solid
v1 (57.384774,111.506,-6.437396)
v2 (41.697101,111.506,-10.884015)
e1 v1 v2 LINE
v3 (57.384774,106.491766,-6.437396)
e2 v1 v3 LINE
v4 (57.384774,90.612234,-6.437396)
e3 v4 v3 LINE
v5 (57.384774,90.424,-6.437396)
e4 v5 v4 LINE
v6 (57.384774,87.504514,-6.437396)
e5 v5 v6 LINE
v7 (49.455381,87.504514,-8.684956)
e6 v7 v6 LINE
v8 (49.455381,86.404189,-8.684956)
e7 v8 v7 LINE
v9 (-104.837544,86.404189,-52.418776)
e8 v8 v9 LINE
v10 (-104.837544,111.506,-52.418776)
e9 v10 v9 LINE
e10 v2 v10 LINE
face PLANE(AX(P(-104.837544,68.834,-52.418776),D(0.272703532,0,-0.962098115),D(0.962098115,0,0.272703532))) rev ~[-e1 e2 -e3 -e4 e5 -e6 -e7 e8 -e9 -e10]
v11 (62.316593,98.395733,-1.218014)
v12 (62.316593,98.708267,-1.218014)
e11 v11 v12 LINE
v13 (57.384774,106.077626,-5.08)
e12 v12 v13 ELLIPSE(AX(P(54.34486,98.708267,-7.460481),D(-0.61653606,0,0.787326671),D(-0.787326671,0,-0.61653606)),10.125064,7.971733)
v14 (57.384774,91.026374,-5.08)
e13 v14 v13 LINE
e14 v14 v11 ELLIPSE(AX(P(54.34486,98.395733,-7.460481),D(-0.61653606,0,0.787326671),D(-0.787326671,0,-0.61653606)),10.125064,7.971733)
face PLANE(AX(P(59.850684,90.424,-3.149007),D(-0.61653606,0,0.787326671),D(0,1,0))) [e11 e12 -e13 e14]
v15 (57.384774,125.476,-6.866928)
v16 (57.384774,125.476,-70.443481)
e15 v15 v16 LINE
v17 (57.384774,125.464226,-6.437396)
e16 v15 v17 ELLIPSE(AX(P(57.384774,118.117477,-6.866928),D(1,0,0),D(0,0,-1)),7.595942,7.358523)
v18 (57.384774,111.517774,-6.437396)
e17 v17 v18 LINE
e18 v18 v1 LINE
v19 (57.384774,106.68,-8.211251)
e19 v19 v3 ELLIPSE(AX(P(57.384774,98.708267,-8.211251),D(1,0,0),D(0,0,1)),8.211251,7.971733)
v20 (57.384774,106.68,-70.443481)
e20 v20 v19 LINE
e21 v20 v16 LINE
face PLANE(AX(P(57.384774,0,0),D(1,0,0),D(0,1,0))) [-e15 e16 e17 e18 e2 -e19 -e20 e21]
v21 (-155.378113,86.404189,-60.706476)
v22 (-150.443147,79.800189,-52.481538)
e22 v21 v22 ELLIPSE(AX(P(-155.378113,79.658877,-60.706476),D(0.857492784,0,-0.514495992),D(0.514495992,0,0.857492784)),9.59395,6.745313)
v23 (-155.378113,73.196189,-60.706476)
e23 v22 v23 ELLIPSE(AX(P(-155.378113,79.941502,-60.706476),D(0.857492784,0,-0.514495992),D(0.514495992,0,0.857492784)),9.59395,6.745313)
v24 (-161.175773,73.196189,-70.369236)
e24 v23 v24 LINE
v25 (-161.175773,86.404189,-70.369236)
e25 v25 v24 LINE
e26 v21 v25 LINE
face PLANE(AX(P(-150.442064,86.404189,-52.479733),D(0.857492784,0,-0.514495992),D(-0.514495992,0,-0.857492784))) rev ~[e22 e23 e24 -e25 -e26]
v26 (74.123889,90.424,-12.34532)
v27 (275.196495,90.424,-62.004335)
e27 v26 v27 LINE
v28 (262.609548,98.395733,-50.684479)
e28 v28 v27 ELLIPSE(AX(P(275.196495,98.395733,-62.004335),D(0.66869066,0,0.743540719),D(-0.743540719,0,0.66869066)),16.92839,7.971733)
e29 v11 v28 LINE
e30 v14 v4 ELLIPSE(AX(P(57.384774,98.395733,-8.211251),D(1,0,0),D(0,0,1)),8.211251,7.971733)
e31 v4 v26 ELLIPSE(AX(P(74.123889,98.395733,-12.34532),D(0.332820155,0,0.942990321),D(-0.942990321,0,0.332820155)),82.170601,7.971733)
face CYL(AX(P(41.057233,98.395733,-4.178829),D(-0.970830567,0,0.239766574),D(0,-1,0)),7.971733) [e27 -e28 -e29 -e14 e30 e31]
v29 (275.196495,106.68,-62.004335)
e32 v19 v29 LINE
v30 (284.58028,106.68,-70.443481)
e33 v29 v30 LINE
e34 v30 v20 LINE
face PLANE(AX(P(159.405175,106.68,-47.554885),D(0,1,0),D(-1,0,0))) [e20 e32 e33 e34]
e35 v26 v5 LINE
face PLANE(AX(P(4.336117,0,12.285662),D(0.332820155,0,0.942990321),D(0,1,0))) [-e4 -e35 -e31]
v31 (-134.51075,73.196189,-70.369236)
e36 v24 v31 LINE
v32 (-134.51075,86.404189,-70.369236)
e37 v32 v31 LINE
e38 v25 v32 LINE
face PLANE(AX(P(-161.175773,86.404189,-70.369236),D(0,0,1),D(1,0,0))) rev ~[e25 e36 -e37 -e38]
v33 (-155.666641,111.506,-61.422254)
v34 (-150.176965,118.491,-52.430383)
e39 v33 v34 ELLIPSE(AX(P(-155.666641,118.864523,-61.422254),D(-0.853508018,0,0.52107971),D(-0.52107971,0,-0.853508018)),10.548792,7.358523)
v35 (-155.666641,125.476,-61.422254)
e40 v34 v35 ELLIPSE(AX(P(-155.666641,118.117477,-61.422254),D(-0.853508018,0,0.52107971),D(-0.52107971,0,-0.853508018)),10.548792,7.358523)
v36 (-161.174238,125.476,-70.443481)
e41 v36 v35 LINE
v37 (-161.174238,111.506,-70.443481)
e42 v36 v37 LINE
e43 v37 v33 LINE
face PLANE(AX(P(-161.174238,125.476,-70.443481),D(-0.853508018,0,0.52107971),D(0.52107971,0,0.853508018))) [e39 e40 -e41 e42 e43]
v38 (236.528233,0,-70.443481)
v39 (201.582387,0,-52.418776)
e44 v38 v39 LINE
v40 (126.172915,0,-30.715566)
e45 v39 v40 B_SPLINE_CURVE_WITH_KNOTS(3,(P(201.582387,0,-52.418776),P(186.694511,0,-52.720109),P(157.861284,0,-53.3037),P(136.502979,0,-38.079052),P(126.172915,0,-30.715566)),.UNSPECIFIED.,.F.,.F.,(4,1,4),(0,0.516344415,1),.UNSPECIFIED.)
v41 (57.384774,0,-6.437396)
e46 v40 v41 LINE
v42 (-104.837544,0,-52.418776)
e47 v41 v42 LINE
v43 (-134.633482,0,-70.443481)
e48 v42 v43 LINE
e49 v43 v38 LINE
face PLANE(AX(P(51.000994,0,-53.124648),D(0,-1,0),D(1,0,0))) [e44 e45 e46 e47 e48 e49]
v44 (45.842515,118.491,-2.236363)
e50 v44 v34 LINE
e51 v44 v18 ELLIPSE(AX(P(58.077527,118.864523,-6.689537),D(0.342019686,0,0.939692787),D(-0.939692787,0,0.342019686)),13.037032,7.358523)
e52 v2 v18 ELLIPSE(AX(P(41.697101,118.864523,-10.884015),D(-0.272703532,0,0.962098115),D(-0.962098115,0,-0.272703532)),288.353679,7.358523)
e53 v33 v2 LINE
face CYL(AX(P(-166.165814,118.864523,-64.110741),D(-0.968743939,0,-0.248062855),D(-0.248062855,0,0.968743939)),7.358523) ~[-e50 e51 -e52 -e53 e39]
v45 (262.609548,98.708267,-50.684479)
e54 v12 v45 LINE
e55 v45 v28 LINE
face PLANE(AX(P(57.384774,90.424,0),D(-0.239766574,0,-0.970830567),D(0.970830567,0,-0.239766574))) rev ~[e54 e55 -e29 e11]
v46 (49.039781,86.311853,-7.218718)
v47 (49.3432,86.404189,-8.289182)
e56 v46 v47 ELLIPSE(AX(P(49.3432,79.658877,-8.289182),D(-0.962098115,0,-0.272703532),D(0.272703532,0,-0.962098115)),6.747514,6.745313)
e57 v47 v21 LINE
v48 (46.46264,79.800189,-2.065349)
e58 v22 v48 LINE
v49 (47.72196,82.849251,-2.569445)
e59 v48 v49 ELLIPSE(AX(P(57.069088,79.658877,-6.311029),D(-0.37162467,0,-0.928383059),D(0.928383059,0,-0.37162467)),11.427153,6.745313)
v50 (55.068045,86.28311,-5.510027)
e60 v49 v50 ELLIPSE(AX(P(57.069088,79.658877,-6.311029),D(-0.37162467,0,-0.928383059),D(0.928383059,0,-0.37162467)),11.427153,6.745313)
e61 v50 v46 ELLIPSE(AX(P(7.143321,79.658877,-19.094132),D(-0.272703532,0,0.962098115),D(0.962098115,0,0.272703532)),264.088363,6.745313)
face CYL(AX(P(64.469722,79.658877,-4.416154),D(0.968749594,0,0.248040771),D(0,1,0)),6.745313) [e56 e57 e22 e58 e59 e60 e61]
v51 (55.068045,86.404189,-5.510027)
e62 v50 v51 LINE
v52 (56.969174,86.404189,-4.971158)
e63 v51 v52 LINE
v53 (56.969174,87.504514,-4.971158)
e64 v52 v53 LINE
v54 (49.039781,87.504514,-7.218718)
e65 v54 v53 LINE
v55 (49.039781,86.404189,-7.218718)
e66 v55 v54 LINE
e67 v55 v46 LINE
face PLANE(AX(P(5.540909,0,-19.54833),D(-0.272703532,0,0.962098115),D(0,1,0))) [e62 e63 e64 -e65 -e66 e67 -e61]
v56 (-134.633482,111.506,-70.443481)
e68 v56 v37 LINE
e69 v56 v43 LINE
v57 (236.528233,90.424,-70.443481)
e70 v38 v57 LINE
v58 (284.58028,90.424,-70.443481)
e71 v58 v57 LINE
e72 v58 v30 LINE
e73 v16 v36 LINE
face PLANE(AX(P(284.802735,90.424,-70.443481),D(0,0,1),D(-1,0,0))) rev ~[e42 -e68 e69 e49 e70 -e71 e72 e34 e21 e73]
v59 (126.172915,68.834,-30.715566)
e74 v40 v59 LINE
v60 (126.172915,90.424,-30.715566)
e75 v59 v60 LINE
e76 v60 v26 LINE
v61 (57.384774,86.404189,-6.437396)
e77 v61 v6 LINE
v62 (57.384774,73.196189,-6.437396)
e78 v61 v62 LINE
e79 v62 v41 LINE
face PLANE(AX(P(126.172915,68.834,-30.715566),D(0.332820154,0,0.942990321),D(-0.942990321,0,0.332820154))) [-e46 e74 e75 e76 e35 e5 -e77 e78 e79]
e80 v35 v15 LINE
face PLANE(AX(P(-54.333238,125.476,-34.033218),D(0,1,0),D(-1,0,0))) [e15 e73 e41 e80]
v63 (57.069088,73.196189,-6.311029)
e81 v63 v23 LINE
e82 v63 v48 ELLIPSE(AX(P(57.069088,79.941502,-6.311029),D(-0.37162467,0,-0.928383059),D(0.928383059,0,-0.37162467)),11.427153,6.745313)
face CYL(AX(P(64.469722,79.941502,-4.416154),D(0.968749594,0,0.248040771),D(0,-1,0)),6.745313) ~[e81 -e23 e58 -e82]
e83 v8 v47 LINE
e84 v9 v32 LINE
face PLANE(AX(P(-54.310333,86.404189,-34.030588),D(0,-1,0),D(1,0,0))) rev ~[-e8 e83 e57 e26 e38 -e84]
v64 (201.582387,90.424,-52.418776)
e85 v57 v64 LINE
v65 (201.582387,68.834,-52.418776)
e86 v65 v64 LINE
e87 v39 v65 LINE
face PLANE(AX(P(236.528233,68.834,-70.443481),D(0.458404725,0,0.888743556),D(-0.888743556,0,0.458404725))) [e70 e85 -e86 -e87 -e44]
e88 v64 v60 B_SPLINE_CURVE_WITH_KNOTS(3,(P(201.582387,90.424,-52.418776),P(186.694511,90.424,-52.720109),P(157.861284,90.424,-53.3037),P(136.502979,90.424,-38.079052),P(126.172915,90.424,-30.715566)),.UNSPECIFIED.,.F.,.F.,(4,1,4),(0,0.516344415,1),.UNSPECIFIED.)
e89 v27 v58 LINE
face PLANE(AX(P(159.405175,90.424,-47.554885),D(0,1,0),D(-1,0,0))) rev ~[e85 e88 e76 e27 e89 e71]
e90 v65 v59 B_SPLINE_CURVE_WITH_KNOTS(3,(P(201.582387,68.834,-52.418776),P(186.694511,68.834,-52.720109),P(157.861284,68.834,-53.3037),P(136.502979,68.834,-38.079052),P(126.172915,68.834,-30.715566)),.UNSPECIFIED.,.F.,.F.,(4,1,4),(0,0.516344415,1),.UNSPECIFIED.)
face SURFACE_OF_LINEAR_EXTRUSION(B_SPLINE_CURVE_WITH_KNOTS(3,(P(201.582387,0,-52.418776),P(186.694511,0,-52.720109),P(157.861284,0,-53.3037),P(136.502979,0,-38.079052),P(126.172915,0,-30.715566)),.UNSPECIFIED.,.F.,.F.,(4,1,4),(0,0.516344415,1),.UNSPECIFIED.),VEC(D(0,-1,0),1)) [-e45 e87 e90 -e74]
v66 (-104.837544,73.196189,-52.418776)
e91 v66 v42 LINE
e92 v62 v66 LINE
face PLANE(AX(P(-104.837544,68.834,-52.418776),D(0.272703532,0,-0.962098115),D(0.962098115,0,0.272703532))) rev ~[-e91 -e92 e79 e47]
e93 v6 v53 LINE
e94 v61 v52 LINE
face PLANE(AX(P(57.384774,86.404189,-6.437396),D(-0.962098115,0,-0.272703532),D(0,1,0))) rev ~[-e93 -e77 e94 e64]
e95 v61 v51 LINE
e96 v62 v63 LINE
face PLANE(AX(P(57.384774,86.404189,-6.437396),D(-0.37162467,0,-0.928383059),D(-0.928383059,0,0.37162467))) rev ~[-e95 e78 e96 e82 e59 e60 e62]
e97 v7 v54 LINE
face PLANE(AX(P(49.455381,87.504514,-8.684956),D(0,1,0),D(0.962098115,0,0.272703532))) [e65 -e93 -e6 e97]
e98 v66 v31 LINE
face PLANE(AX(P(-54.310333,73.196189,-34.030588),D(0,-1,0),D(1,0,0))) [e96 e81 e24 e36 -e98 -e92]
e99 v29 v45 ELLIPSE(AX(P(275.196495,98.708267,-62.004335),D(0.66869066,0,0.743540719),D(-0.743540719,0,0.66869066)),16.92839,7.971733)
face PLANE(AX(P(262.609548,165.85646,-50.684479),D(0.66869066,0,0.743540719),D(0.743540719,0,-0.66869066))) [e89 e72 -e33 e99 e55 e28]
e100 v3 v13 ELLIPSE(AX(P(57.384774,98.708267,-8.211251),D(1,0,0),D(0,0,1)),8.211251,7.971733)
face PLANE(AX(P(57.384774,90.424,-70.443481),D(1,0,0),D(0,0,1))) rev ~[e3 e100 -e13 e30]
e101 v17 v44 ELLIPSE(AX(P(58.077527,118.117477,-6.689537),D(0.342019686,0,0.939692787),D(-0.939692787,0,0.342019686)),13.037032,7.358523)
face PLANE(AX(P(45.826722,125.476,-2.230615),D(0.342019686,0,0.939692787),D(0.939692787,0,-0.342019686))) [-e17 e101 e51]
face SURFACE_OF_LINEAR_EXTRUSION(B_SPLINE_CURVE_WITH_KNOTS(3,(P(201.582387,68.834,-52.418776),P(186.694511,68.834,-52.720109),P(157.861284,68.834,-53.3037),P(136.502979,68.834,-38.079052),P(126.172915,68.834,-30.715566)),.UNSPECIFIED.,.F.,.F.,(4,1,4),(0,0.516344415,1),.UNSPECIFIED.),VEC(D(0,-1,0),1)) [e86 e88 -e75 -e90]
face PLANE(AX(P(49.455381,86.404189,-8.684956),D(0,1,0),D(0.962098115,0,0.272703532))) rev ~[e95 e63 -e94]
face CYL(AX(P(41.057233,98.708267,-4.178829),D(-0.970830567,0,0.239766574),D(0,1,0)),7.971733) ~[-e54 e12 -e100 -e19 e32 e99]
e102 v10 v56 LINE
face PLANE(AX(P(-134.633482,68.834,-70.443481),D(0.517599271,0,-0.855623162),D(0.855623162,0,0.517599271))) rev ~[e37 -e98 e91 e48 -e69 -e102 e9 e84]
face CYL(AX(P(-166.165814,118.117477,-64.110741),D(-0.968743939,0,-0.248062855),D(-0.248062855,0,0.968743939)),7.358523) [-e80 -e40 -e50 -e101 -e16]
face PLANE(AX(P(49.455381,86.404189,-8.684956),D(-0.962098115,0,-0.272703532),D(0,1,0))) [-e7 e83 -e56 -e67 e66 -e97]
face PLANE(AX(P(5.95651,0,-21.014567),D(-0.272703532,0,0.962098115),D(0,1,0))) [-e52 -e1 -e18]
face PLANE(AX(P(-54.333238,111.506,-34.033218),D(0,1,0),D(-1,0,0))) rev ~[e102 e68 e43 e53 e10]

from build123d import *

# Parameters (mm, degrees)
F1_DEPTH      = 68.834
F3_DEPTH      = 56.642
F4_DEPTH      = 21.59
F6_DEPTH      = 16.256
F7_T1_DEPTH   = 134.6089194051
F8_SIZE       = 5.08
F9_T4_DEPTH   = 246.1695934192
F9_T9_DEPTH   = 246.1695934192
F11_DEPTH     = 13.97
F12_T1_DEPTH  = 239.1129526059
F12_T6_DEPTH  = 239.1129526059
F13_W         = 8.2417714845
F13_H         = 1.1003240943
F14_DEPTH     = 1.524
F16_DEPTH     = 13.208
F17_T1_DEPTH  = 236.9807138407
F17_T6_DEPTH  = 236.9807138407
F17_T12_DEPTH = 236.9807138407
F17_T18_DEPTH = 236.9807138407


# Not quite as in the source:
# - a fillet or chamfer that OpenCascade refuses, or shapes differently, is made with other operations: its cross-section is extruded or revolved along the edge and cut away or added


with BuildPart() as f1:
    # F0 (on Front) → F1 (new body)
    with BuildSketch(Plane.XZ):
        with BuildLine():
            Line((-134.6334815025, -70.4434812069), (236.5282326937, -70.4434812069))
            Line((236.5282326937, -70.4434812069), (201.5823870897, -52.4187758565))
            add(Edge.make_bspline(
                [(201.5823870897, -52.4187758565), (186.6945113423, -52.7201094998), (157.86128429, -53.3036998994), (136.5029788289, -38.0790520799), (126.1729151011, -30.7155661285)],
                knots=[0, 0, 0, 0, 0.5163444147, 1, 1, 1, 1], degree=3))
            Line((126.1729151011, -30.7155661285), (57.3847740889, -6.4373956993))
            Line((57.3847740889, -6.4373956993), (-104.8375442624, -52.4187758565))
            Line((-104.8375442624, -52.4187758565), (-134.6334815025, -70.4434812069))
        make_face()
    extrude(amount=-F1_DEPTH)

    # F2 (on face) → F3 (join)
    with BuildSketch(Plane(origin=(0, 68.834, 0), x_dir=(-1, 0, 0), z_dir=(0, 1, 0))):
        Polygon((104.8375442624, -52.4187758565), (-57.3847740889, -6.4373956993), (-57.3847740889, -70.4434812069), (134.6334815025, -70.4434812069), align=None)
    extrude(amount=F3_DEPTH)

    # F4 (add): a face of the model
    f4_faces = [f1.faces().sort_by_distance(p)[0] for p in [
        (117.597457412, 68.834, -49.4942566091),
    ]]
    extrude(f4_faces, amount=F4_DEPTH)

    # F5 (on face) → F6 (join)
    with BuildSketch(Plane(origin=(0, 90.424, 0), x_dir=(-1, 0, 0), z_dir=(0, 1, 0))):
        Polygon((-284.8027348518, -56.1655424535), (-284.8027348518, -70.4434812069), (-57.3847740889, -70.4434812069), (-57.3847740889, 0), align=None)
    extrude(amount=F6_DEPTH)

    # F7: chamfer of 22.86 x 14.478 on 1 edges, made by hand

    # F7_s2 → F7_t1 (cut)
    with BuildSketch(Plane.XZ.offset(-165.8564597025)):
        Polygon((262.6095480908, -50.6844785612), (284.8027348518, -70.6435424535), (284.8027348518, -56.1655424535), align=None)
    extrude(amount=F7_T1_DEPTH, mode=Mode.SUBTRACT)

    # F8
    f8_edges = [f1.edges().sort_by_distance(p)[0] for p in [
        (57.384774, 98.552, 0),
    ]]
    chamfer(f8_edges, length=F8_SIZE)

    # F9: fillet of radius 7.971733183 on 2 edges, made by hand


with BuildPart() as f9_tool2:
    # F9_s3 → F9_t4 (new body)
    with BuildSketch(Plane(origin=(39.6696512747, 0, -9.7972362223), x_dir=(0, 1, 0), z_dir=(0.970830567, 0, -0.2397665745))):
        with BuildLine():
            ThreePointArc((106.68, 5.7872175269), (104.3451334085, 11.4240841184), (98.708266817, 13.7589507099))
            Line((98.708266817, 13.7589507099), (106.68, 13.7589507099))
            Line((106.68, 13.7589507099), (106.68, 5.7872175269))
        make_face()
    extrude(amount=F9_T4_DEPTH)

    split(bisect_by=Plane.YZ.offset(57.3847740889), keep=Keep.TOP)


with BuildPart() as f1_1:
    add(f1.part)

    # F9_t1: cut F9_tool2
    add(f9_tool2.part, mode=Mode.SUBTRACT)


with BuildPart() as f9_tool7:
    # F9_s8 → F9_t9 (new body)
    with BuildSketch(Plane(origin=(39.6696512747, 0, -9.7972362223), x_dir=(0, 1, 0), z_dir=(0.970830567, 0, -0.2397665745))):
        with BuildLine():
            ThreePointArc((90.424, 5.7872175269), (92.7588665915, 11.4240841184), (98.395733183, 13.7589507099))
            Line((98.395733183, 13.7589507099), (90.424, 13.7589507099))
            Line((90.424, 13.7589507099), (90.424, 5.7872175269))
        make_face()
    extrude(amount=F9_T9_DEPTH)

    split(bisect_by=Plane(origin=(4.3361166105, 0, 12.285662205), x_dir=(0, 1, 0), z_dir=(0.3328201545, 0, 0.9429903206)), keep=Keep.TOP)


with BuildPart() as f1_2:
    add(f1_1.part)

    # F9_t6: cut F9_tool7
    add(f9_tool7.part, mode=Mode.SUBTRACT)

    # F10 (on face) → F11 (join)
    with BuildSketch(Plane(origin=(0, 125.476, 0), x_dir=(-1, 0, 0), z_dir=(0, 1, 0))):
        Polygon((-45.8267219365, -2.2306151222), (-57.3847740889, -6.4373956993), (104.8375442624, -52.4187758565), (134.6334815025, -70.4434812069), (161.1742377281, -70.4434812069), (150.1698791981, -52.4187758565), align=None)
    extrude(amount=-F11_DEPTH)

    # F12: fillet of radius 7.3585229381 on 2 edges, made by hand

    # F12_s2 → F12_t1 (cut)
    with BuildSketch(Plane(origin=(-171.3471837913, 0, -43.8762710766), x_dir=(0, 1, 0), z_dir=(0.9687439392, 0, 0.2480628554))):
        with BuildLine():
            ThreePointArc((118.1174770619, -13.5288023788), (123.3207385309, -15.6840638479), (125.476, -20.8873253169))
            Line((125.476, -20.8873253169), (125.476, -13.5288023788))
            Line((125.476, -13.5288023788), (118.1174770619, -13.5288023788))
        make_face()
    extrude(amount=F12_T1_DEPTH, mode=Mode.SUBTRACT)


with BuildPart() as f12_tool4:
    # F12_s5 → F12_t6 (new body)
    with BuildSketch(Plane(origin=(-171.3471837913, 0, -43.8762710766), x_dir=(0, 1, 0), z_dir=(0.9687439392, 0, 0.2480628554))):
        with BuildLine():
            ThreePointArc((118.8645229381, -13.5288023788), (113.6612614691, -15.6840638479), (111.506, -20.8873253169))
            Line((111.506, -20.8873253169), (111.506, -13.5288023788))
            Line((111.506, -13.5288023788), (118.8645229381, -13.5288023788))
        make_face()
    extrude(amount=F12_T6_DEPTH)

    split(bisect_by=Plane(origin=(5.9565096776, 0, -21.0145673287), x_dir=(0, 1, 0), z_dir=(-0.272703532, 0, 0.9620981154)), keep=Keep.TOP)


with BuildPart() as f1_3:
    add(f1_2.part)

    # F12_t3: cut F12_tool4
    add(f12_tool4.part, mode=Mode.SUBTRACT)

    # F13 (on face) → F14 (join)
    with BuildSketch(Plane(origin=(5.9565096776, 0, -21.0145673287), x_dir=(0.9620981154, 0, 0.272703532), z_dir=(-0.272703532, 0, 0.9620981154))):
        with Locations((49.3333967155, 86.9543515146)):
            Rectangle(F13_W, F13_H)
    extrude(amount=F14_DEPTH)

    # F15 (on face) → F16 (join)
    with BuildSketch(Plane.XZ.offset(-86.4041894674)):
        Polygon((-104.8238277435, -52.4797327816), (57.3847740889, -6.4373956993), (46.4603118598, -2.0644166507), (-150.4420638084, -52.4797327816), (-161.1757725477, -70.3692361712), (-134.1178864241, -70.3692361712), align=None)
    extrude(amount=F16_DEPTH)

    # F17: fillet of radius 6.7453126933 on 2 edges, made by hand

    # F17_s2 → F17_t1 (cut)
    with BuildSketch(Plane(origin=(59.4421171299, 0, 15.219690044), x_dir=(0, 1, 0), z_dir=(-0.9687495941, 0, -0.2480407708))):
        with BuildLine():
            ThreePointArc((73.1961894674, 20.2692670518), (75.1718458141, 15.4996107052), (79.9415021607, 13.5239543585))
            Line((79.9415021607, 13.5239543585), (73.1961894674, 13.5239543585))
            Line((73.1961894674, 13.5239543585), (73.1961894674, 20.2692670518))
        make_face()
    extrude(amount=F17_T1_DEPTH, mode=Mode.SUBTRACT)


with BuildPart() as f17_tool4:
    # F17_s5 → F17_t6 (new body)
    with BuildSketch(Plane(origin=(59.4421171299, 0, 15.219690044), x_dir=(0, 1, 0), z_dir=(-0.9687495941, 0, -0.2480407708))):
        with BuildLine():
            ThreePointArc((86.4041894674, 20.2692670518), (84.4285331208, 15.4996107052), (79.6588767742, 13.5239543585))
            Line((79.6588767742, 13.5239543585), (86.4041894674, 13.5239543585))
            Line((86.4041894674, 13.5239543585), (86.4041894674, 20.2692670518))
        make_face()
    extrude(amount=F17_T6_DEPTH)

    split(bisect_by=Plane(origin=(43.4988715987, 0, 12.3296114352), x_dir=(0, 1, 0), z_dir=(0.9620981154, 0, 0.272703532)), keep=Keep.TOP)

    split(bisect_by=Plane(origin=(5.5409094947, 0, -19.5483298008), x_dir=(0, 1, 0), z_dir=(-0.272703532, 0, 0.9620981154)), keep=Keep.TOP)


with BuildPart() as f1_4:
    add(f1_3.part)

    # F17_t3: cut F17_tool4
    add(f17_tool4.part, mode=Mode.SUBTRACT)


with BuildPart() as f17_tool10:
    # F17_s11 → F17_t12 (new body)
    with BuildSketch(Plane(origin=(59.4421171299, 0, 15.219690044), x_dir=(0, 1, 0), z_dir=(-0.9687495941, 0, -0.2480407708))):
        with BuildLine():
            ThreePointArc((86.4041894674, 20.2692670518), (84.4285331208, 15.4996107052), (79.6588767742, 13.5239543585))
            Line((79.6588767742, 13.5239543585), (86.4041894674, 13.5239543585))
            Line((86.4041894674, 13.5239543585), (86.4041894674, 20.2692670518))
        make_face()
    extrude(amount=F17_T12_DEPTH)

    split(bisect_by=Plane(origin=(43.4988715987, 0, 12.3296114352), x_dir=(0, 1, 0), z_dir=(-0.9620981154, 0, -0.272703532)), keep=Keep.TOP)

    split(bisect_by=Plane(origin=(5.5409094947, 0, -19.5483298008), x_dir=(0, 1, 0), z_dir=(0.272703532, 0, -0.9620981154)), keep=Keep.TOP)


with BuildPart() as f1_5:
    add(f1_4.part)

    # F17_t9: cut F17_tool10
    add(f17_tool10.part, mode=Mode.SUBTRACT)


with BuildPart() as f17_tool16:
    # F17_s17 → F17_t18 (new body)
    with BuildSketch(Plane(origin=(59.4421171299, 0, 15.219690044), x_dir=(0, 1, 0), z_dir=(-0.9687495941, 0, -0.2480407708))):
        with BuildLine():
            ThreePointArc((86.4041894674, 20.2692670518), (84.4285331208, 15.4996107052), (79.6588767742, 13.5239543585))
            Line((79.6588767742, 13.5239543585), (86.4041894674, 13.5239543585))
            Line((86.4041894674, 13.5239543585), (86.4041894674, 20.2692670518))
        make_face()
    extrude(amount=F17_T18_DEPTH)

    split(bisect_by=Plane(origin=(43.4988715987, 0, 12.3296114352), x_dir=(0, 1, 0), z_dir=(-0.9620981154, 0, -0.272703532)), keep=Keep.TOP)

    split(bisect_by=Plane(origin=(5.5409094947, 0, -19.5483298008), x_dir=(0, 1, 0), z_dir=(-0.272703532, 0, 0.9620981154)), keep=Keep.TOP)


with BuildPart() as f1_6:
    add(f1_5.part)

    # F17_t15: cut F17_tool16
    add(f17_tool16.part, mode=Mode.SUBTRACT)


solid = f1_6.part
